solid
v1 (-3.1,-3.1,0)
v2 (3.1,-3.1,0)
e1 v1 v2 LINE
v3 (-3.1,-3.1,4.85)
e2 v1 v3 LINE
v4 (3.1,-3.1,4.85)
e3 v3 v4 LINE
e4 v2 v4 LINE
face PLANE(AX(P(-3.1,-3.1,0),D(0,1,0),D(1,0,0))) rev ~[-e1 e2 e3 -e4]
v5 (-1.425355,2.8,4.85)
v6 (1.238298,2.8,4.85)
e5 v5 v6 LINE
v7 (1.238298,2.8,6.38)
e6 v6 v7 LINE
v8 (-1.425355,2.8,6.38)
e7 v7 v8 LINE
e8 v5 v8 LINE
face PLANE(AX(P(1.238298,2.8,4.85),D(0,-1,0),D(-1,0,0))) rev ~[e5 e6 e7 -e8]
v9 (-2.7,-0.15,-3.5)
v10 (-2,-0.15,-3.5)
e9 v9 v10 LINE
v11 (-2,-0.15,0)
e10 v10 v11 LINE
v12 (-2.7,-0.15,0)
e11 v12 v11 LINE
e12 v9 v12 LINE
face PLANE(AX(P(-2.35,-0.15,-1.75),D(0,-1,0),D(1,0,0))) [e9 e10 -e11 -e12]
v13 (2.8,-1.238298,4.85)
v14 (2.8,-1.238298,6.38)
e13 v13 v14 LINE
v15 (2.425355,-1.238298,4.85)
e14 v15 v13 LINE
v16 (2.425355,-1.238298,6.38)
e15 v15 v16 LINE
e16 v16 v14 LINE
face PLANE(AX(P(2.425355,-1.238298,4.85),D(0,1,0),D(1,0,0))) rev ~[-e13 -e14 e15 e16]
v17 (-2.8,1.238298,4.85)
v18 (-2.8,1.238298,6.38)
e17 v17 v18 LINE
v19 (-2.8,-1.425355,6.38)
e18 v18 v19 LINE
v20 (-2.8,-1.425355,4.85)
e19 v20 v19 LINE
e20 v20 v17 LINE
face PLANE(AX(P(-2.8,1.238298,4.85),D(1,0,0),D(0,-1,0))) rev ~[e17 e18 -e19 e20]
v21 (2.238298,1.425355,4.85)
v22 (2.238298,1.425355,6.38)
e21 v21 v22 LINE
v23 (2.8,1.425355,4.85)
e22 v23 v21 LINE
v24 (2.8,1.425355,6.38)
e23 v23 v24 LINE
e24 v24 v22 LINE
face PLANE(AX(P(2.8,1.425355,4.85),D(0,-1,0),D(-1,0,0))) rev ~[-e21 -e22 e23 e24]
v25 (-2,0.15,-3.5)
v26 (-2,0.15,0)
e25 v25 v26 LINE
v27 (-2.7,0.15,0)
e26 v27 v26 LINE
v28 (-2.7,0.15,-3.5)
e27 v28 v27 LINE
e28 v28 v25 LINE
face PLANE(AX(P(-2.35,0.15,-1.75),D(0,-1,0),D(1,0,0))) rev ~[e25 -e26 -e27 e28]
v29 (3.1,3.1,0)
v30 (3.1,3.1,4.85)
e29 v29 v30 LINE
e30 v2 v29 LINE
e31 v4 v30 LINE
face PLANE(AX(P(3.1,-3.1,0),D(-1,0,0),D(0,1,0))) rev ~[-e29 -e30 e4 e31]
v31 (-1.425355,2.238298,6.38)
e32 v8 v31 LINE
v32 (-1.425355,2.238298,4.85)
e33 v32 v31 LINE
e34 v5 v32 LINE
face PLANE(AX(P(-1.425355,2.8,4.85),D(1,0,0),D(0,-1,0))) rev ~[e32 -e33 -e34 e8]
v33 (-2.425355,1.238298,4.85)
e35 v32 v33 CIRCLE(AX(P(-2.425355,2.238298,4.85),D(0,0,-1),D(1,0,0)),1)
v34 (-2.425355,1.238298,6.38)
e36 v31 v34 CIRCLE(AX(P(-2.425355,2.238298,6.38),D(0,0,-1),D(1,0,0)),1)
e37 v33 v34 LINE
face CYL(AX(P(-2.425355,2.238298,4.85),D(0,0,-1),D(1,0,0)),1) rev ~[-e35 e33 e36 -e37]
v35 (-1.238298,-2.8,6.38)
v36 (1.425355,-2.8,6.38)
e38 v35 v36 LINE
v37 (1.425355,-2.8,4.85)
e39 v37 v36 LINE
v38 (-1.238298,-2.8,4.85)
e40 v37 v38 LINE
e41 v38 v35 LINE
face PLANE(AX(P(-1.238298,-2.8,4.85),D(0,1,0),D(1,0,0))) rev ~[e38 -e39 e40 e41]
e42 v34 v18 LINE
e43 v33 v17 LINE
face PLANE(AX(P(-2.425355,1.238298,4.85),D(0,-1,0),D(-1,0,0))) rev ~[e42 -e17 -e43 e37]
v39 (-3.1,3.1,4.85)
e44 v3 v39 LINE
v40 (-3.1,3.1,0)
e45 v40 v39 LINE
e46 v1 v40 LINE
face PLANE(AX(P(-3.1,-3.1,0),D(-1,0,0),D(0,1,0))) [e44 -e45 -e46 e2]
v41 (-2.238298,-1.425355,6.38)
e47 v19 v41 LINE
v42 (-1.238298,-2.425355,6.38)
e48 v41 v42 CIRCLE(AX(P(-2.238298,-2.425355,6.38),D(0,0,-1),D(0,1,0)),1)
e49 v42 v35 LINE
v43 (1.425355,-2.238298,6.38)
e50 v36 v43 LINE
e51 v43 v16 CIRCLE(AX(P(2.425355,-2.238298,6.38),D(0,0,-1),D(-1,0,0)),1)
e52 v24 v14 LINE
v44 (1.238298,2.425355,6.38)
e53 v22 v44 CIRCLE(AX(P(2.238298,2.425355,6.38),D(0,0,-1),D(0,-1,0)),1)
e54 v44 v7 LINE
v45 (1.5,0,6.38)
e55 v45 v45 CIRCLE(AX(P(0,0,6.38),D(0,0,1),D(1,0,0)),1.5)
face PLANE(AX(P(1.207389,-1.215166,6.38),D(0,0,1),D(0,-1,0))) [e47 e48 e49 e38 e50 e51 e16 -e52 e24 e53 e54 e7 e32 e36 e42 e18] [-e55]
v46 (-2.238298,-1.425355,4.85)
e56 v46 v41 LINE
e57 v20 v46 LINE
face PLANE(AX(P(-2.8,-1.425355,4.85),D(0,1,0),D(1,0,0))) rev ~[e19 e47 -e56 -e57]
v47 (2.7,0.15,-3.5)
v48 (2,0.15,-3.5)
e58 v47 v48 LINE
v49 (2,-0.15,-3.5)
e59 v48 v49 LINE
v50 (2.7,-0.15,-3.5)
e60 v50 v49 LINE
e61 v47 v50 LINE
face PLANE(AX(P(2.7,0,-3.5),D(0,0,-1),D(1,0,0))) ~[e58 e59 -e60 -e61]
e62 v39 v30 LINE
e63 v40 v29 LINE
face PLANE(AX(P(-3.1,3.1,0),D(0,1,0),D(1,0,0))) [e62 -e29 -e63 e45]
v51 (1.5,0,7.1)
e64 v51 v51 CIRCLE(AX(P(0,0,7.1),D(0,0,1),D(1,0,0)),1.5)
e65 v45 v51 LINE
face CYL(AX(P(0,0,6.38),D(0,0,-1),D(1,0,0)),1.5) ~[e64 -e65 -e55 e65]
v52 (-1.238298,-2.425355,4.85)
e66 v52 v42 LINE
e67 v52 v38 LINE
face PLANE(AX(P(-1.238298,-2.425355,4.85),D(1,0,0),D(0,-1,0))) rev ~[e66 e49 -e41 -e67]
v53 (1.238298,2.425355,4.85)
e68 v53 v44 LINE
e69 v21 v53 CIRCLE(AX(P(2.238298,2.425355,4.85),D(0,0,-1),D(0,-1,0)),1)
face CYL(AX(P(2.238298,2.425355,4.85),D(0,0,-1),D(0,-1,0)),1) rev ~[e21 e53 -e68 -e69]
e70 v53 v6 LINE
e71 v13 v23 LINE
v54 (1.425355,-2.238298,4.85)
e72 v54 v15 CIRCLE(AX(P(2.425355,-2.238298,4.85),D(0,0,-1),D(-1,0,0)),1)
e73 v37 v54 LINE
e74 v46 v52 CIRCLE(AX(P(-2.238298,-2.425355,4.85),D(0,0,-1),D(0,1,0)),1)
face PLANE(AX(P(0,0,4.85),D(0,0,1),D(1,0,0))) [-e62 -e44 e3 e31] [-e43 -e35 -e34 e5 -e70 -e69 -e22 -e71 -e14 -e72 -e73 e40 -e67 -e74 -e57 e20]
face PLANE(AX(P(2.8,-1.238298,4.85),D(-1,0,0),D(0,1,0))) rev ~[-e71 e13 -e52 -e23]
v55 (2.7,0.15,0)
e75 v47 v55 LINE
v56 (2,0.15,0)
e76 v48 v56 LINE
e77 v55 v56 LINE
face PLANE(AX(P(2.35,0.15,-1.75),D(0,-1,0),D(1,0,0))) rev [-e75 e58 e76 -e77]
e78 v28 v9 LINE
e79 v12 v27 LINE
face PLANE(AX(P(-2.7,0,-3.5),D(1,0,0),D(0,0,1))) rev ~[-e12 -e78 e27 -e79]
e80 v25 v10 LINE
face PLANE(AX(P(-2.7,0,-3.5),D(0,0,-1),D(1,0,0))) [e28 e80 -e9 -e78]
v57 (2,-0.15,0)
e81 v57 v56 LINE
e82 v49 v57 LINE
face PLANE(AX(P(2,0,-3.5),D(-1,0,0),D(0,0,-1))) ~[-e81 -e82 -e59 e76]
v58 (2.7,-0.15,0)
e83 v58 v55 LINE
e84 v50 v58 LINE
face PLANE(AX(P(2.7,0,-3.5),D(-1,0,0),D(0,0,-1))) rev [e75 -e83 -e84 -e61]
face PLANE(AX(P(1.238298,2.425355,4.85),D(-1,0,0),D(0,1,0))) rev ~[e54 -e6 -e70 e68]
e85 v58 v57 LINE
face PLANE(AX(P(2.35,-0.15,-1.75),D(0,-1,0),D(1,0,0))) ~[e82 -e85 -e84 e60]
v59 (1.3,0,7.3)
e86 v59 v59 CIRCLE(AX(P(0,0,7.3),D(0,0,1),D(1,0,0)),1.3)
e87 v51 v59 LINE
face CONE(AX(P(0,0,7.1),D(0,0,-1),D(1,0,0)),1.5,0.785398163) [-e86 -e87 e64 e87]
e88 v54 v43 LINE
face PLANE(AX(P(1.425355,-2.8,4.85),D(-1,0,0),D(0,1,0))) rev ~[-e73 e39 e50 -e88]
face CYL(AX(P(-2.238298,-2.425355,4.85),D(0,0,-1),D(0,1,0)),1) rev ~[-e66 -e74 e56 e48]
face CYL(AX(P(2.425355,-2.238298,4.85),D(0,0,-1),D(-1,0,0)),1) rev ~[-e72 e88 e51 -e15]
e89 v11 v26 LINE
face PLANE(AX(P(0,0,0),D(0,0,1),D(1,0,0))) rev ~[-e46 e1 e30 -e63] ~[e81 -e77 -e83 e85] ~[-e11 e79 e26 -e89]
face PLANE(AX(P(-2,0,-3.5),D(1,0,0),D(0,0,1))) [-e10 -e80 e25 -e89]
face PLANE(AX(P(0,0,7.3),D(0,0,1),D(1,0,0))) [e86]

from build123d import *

# Parameters (mm, degrees)
F0_W            = 6.2
F0_H            = 6.2
F1_DEPTH        = 4.85
F3_DEPTH        = 1.53
F3_COPIES_COUNT = 4
F4_R            = 1.5
F5_DEPTH        = 0.92
F6_SIZE         = 0.2
F7_W            = 0.7
F7_H            = 3.5
F8_DEPTH        = 0.15


# Not quite as in the source:
# - a pattern or mirror of a feature is missing from the dataset's text; its kind, count and spacing are read off the source's solid


with BuildPart() as f1:
    # F0 (on Top) → F1 (new body)
    with BuildSketch(Plane.XY):
        Rectangle(F0_W, F0_H)
    extrude(amount=F1_DEPTH)

    # F2 (on face) → F3 (join)
    with BuildSketch(Plane.XY.offset(4.85)):
        with BuildLine():
            Line((1.2382979223, 2.8), (0, 2.8))
            Line((0, 2.8), (0, 0))
            Line((0, 0), (2.8, 0))
            Line((2.8, 0), (2.8, 1.4253550908))
            Line((2.8, 1.4253550908), (2.2382979223, 1.4253550908))
            ThreePointArc((2.2382979223, 1.4253550908), (1.5311911411, 1.7182483096), (1.2382979223, 2.4253550908))
            Line((1.2382979223, 2.4253550908), (1.2382979223, 2.8))
        make_face()
    f3 = extrude(amount=F3_DEPTH)

    # F3_copies: F3 ×4 about axis
    f3_copies_axis = Axis((0, 0, 0), (0, 0, 1))
    for i in range(1, F3_COPIES_COUNT):
        add(f3.rotate(f3_copies_axis, i * 360 / F3_COPIES_COUNT))

    # F4 (on face) → F5 (join)
    with BuildSketch(Plane.XY.offset(6.38)):
        Circle(F4_R)
    extrude(amount=F5_DEPTH)

    # F6
    f6_edges = [f1.edges().sort_by_distance(p)[0] for p in [
        (-1.5, 0, 7.3),
    ]]
    chamfer(f6_edges, length=F6_SIZE)

    # F7 (on Front) → F8 (join, symmetric)
    with BuildSketch(Plane.XZ):
        with Locations((-2.35, -1.75)):
            Rectangle(F7_W, F7_H)
    f8 = extrude(amount=F8_DEPTH, both=True)

    # F8_copies: F8 across plane
    add(f8.mirror(Plane(origin=(0, 0, 0), x_dir=(0, 0, 1), z_dir=(1, 0, 0))))


solid = f1.part
